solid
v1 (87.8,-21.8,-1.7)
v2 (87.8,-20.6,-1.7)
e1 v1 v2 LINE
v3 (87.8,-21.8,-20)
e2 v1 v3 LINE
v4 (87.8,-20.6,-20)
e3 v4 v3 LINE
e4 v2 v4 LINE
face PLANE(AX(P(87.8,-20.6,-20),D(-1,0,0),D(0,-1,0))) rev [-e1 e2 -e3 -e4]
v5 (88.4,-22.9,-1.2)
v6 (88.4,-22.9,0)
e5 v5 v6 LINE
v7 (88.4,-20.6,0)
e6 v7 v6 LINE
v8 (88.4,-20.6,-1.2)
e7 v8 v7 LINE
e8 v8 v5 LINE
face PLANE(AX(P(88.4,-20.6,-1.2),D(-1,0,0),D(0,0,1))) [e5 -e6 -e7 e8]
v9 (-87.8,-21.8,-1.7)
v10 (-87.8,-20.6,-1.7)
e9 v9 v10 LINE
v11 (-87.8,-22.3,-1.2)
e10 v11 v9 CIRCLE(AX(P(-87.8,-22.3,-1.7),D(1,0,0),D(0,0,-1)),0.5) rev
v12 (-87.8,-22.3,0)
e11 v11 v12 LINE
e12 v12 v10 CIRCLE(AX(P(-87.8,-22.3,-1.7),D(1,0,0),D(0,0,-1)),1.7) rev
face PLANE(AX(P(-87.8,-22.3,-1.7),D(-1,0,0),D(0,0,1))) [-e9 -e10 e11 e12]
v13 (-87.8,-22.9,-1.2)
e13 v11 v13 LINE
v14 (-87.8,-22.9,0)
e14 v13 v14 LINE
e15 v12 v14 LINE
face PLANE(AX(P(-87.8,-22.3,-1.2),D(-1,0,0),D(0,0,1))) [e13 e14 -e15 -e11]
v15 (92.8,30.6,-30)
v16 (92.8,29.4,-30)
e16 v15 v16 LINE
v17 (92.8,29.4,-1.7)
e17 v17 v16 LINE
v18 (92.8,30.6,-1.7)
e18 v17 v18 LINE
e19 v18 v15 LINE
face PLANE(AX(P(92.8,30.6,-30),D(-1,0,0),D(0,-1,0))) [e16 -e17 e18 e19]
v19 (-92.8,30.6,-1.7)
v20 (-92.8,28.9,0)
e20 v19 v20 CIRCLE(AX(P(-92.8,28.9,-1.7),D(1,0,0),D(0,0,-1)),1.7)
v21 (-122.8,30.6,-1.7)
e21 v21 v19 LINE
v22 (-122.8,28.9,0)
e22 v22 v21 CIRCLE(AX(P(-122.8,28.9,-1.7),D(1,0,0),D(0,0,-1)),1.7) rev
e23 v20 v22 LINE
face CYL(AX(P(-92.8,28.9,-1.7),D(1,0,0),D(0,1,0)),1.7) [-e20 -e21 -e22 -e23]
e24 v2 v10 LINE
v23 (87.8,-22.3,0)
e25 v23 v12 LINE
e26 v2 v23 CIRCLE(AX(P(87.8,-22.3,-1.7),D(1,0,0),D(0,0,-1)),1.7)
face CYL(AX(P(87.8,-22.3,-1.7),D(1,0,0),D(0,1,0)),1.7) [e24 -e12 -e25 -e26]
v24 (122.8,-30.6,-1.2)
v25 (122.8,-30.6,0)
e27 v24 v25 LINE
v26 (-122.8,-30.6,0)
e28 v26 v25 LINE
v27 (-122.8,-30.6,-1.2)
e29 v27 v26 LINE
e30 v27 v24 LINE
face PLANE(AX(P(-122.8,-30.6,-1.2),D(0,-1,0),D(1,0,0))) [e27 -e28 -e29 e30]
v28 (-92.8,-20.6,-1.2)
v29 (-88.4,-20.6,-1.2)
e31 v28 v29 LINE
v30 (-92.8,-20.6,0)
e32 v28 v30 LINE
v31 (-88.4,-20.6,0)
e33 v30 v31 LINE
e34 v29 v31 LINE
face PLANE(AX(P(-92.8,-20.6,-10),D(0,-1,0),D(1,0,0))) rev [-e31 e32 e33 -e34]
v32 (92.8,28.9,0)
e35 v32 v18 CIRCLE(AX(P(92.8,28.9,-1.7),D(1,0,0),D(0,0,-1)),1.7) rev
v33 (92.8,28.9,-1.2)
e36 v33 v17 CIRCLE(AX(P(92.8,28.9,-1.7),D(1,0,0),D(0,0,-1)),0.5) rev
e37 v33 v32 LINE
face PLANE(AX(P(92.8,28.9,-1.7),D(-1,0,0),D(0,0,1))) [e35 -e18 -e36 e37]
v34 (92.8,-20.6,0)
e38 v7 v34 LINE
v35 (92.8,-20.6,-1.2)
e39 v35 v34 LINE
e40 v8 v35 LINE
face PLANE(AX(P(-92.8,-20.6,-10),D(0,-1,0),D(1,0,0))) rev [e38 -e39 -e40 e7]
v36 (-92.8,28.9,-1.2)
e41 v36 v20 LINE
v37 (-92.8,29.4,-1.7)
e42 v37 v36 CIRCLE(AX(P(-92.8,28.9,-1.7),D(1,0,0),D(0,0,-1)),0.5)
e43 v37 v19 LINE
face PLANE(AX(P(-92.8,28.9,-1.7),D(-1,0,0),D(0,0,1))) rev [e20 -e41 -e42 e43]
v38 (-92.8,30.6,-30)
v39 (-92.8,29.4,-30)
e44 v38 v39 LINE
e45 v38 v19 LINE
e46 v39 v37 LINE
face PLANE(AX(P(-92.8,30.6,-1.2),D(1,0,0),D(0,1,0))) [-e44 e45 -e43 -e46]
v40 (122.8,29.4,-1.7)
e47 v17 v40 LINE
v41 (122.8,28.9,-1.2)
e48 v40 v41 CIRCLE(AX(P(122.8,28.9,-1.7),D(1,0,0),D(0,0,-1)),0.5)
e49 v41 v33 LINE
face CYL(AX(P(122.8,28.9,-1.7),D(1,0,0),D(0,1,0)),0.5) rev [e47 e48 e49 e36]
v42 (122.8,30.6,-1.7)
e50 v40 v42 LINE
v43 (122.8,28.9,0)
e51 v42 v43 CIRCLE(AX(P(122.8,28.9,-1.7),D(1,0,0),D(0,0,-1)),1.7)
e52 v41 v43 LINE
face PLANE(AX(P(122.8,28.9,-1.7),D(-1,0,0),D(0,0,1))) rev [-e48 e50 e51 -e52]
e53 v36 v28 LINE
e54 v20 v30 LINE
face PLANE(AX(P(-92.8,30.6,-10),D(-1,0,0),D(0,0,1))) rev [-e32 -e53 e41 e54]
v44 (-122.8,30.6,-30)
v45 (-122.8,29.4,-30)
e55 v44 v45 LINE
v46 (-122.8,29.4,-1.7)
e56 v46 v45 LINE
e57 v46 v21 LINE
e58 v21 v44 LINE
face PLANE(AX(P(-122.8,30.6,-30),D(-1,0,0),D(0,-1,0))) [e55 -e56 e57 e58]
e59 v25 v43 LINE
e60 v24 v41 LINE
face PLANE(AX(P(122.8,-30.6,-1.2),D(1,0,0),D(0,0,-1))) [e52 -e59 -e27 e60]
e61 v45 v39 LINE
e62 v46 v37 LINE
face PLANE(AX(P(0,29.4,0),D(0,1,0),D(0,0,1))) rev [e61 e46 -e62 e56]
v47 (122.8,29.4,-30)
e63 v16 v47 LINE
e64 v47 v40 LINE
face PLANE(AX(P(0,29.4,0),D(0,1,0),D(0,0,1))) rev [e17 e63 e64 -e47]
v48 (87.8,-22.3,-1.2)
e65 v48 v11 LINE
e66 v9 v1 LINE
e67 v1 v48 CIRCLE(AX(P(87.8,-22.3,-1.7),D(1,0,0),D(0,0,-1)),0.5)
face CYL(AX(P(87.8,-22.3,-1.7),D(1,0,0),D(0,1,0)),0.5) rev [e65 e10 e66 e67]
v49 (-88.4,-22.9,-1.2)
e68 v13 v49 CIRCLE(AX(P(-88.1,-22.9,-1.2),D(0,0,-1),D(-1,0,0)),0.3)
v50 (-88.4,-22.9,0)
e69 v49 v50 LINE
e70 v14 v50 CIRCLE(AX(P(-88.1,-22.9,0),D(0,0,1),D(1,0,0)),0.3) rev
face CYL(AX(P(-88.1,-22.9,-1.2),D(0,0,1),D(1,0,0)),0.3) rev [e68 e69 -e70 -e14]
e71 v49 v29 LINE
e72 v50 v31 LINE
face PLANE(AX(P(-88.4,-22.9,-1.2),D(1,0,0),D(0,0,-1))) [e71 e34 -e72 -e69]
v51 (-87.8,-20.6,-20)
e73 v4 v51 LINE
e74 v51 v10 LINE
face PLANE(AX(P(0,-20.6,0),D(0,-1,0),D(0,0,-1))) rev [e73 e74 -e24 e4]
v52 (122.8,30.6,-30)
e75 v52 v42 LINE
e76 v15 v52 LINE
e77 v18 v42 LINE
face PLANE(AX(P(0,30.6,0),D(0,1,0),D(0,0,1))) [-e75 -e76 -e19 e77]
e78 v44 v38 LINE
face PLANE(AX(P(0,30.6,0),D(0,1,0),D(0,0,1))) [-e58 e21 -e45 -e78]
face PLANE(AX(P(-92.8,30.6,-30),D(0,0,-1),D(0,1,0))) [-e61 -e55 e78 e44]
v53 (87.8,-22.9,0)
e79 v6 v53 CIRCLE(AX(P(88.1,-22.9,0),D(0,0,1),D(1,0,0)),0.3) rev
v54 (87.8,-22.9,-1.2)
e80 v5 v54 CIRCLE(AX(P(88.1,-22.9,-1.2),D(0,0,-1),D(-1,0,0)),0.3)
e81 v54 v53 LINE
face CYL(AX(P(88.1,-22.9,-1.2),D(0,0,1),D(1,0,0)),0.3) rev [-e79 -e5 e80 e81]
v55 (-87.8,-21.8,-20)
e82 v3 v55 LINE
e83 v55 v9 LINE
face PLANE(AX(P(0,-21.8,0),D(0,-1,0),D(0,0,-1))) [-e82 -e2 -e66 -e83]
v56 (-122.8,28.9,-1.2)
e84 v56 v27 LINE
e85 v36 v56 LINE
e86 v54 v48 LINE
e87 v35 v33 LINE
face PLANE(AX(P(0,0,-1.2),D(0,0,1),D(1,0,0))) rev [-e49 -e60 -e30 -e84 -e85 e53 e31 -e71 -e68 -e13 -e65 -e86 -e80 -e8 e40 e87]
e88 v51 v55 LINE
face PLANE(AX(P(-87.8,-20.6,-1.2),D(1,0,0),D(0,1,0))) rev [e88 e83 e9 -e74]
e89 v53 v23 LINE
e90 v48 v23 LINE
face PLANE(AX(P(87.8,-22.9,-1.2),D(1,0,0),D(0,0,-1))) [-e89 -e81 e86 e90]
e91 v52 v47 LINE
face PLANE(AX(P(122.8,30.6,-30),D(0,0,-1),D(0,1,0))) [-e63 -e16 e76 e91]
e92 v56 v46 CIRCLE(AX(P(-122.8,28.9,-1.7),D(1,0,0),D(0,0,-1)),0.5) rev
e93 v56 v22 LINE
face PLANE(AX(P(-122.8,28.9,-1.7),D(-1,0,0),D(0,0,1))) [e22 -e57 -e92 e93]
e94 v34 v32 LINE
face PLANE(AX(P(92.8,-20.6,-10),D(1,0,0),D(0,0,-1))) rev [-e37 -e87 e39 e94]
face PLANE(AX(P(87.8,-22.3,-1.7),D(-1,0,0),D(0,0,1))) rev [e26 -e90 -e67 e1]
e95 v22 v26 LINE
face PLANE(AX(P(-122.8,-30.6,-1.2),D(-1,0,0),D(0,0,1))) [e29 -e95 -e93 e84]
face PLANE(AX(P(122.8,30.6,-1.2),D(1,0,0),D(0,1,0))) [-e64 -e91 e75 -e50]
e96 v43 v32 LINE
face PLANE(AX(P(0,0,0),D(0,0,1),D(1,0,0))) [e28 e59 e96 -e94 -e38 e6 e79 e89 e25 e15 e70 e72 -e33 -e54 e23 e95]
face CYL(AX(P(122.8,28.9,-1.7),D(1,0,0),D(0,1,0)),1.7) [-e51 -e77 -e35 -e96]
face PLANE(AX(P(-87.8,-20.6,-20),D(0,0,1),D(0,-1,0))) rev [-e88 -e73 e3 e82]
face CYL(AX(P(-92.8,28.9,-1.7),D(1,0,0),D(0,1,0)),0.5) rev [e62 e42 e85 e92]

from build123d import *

# Parameters (mm, degrees)
SKETCH_2_W                         = 245.6
SKETCH_2_H                         = 61.2
SM_BASE_FLANGE_1_DEPTH             = 1.2
SKETCH_8_W                         = 185.6
SKETCH_8_H                         = 51.2
CUT_EXTRUDE_1_DEPTH                = 10
SM_EDGE_FLANGE_1_STRIP_W           = 5.8
SM_EDGE_FLANGE_1_STRIP_H           = 1.2
SM_EDGE_FLANGE_1_STRIP_CUT_DEPTH   = 30
SM_EDGE_FLANGE_1_STRIP_2_W         = 5.8
SM_EDGE_FLANGE_1_STRIP_2_H         = 1.2
SM_EDGE_FLANGE_1_STRIP_CUT_2_DEPTH = 30
SM_EDGE_FLANGE_1_DEPTH             = 30
SM_EDGE_FLANGE_1_BEND_DEPTH        = 30
SM_START                           = -1.7
SM_EDGE_FLANGE_2_DEPTH             = 2.7
SM_START_2                         = -20
SM_EDGE_FLANGE_2_2_OUTLINE_W       = 175.6
SM_EDGE_FLANGE_2_2_OUTLINE_H       = 1.2
SM_EDGE_FLANGE_2_2_DEPTH           = 18.3
SM_START_3                         = -87.8
SM_EDGE_FLANGE_2_3_DEPTH           = 175.6
SM_EDGE_FLANGE_2_4_DEPTH           = 175.6


with BuildPart() as part:
    # 基体-法兰1: sheet metal written as solids
    # Sketch 2 → 基体-法兰1 (new body)
    with BuildSketch(Plane.XY):
        Rectangle(SKETCH_2_W, SKETCH_2_H)
    extrude(amount=-SM_BASE_FLANGE_1_DEPTH)

    # 草图8 → 切除-拉伸1 (cut)
    with BuildSketch(Plane.XY):
        with Locations((0, 5)):
            Rectangle(SKETCH_8_W, SKETCH_8_H)
    extrude(amount=-CUT_EXTRUDE_1_DEPTH, mode=Mode.SUBTRACT)

    # 边线-法兰1: sheet metal written as solids
    # 边线-法兰1 strip (on a plane across the edge) → 边线-法兰1 strip cut (cut)
    with BuildSketch(Plane(origin=(92.8, 30.6, -1.2), x_dir=(0, -1, 0), z_dir=(1, 0, 0))):
        with Locations((-1.2, -0.6)):
            Rectangle(SM_EDGE_FLANGE_1_STRIP_W, SM_EDGE_FLANGE_1_STRIP_H)
    extrude(amount=SM_EDGE_FLANGE_1_STRIP_CUT_DEPTH, mode=Mode.SUBTRACT)

    # 边线-法兰1 strip 2 (on a plane across the edge) → 边线-法兰1 strip cut 2 (cut)
    with BuildSketch(Plane(origin=(-122.8, 30.6, -1.2), x_dir=(0, -1, 0), z_dir=(1, 0, 0))):
        with Locations((-1.2, -0.6)):
            Rectangle(SM_EDGE_FLANGE_1_STRIP_2_W, SM_EDGE_FLANGE_1_STRIP_2_H)
    extrude(amount=SM_EDGE_FLANGE_1_STRIP_CUT_2_DEPTH, mode=Mode.SUBTRACT)

    # 边线-法兰1 section (on a plane across the edge) → 边线-法兰1 (add)
    with BuildSketch(Plane(origin=(92.8, 30.6, -1.2), x_dir=(0, -1, 0), z_dir=(1, 0, 0))):
        with BuildLine():
            Line((0, 0.5), (0, 28.8))
            Line((0, 28.8), (1.2, 28.8))
            Line((1.2, 28.8), (1.2, 0.5))
            ThreePointArc((1.2, 0.5), (1.346446609, 0.146446609), (1.7, 0))
            Line((1.7, 0), (1.7, -1.2))
            ThreePointArc((1.7, -1.2), (0.497918472, -0.702081528), (0, 0.5))
        make_face()
    extrude(amount=SM_EDGE_FLANGE_1_DEPTH)

    # 边线-法兰1 section 2 (on a plane across the edge) → 边线-法兰1 bend (add)
    with BuildSketch(Plane(origin=(-122.8, 30.6, -1.2), x_dir=(0, -1, 0), z_dir=(1, 0, 0))):
        with BuildLine():
            Line((0, 0.5), (0, 28.8))
            Line((0, 28.8), (1.2, 28.8))
            Line((1.2, 28.8), (1.2, 0.5))
            ThreePointArc((1.2, 0.5), (1.346446609, 0.146446609), (1.7, 0))
            Line((1.7, 0), (1.7, -1.2))
            ThreePointArc((1.7, -1.2), (0.497918472, -0.702081528), (0, 0.5))
        make_face()
    extrude(amount=SM_EDGE_FLANGE_1_BEND_DEPTH)

    # 边线-法兰2: read off the stored shape, not the designer's step
    # 边线-法兰2 outline → 边线-法兰2 (cut)
    with BuildSketch(Plane.XY.offset(SM_START)):
        with BuildLine():
            Line((-87.8, -22.9), (-87.8, -20.6))
            Line((-87.8, -20.6), (-88.4, -20.6))
            Line((-88.4, -20.6), (-88.4, -22.9))
            ThreePointArc((-88.4, -22.9), (-88.1, -23.2), (-87.8, -22.9))
        make_face()
        with BuildLine():
            Line((88.4, -20.6), (87.8, -20.6))
            Line((87.8, -20.6), (87.8, -22.9))
            ThreePointArc((87.8, -22.9), (88.1, -23.2), (88.4, -22.9))
            Line((88.4, -22.9), (88.4, -20.6))
        make_face()
    extrude(amount=SM_EDGE_FLANGE_2_DEPTH, mode=Mode.SUBTRACT)

    # Sm Edge Flange 2 3 outline → Sm Edge Flange 2 3 (cut)
    with BuildSketch(Plane.YZ.offset(SM_START_3)):
        with BuildLine():
            ThreePointArc((-22.3, 0), (-21.290049506, -0.332520567), (-20.675192319, -1.2))
            Line((-20.675192319, -1.2), (-20.6, -1.2))
            Line((-20.6, -1.2), (-20.6, 0))
            Line((-20.6, 0), (-22.3, 0))
        make_face()
    extrude(amount=SM_EDGE_FLANGE_2_3_DEPTH, mode=Mode.SUBTRACT)



with BuildPart() as body_2:
    # Sm Edge Flange 2 2 outline → Sm Edge Flange 2 2 (new body)
    with BuildSketch(Plane.XY.offset(SM_START_2)):
        with Locations((0, -21.2)):
            Rectangle(SM_EDGE_FLANGE_2_2_OUTLINE_W, SM_EDGE_FLANGE_2_2_OUTLINE_H)
    extrude(amount=SM_EDGE_FLANGE_2_2_DEPTH)


with BuildPart() as part_1:
    add(part.part)

    add(body_2.part)  # Sm Edge Flange 2 4 merges body 2
    # Sm Edge Flange 2 4 outline → Sm Edge Flange 2 4 (add)
    with BuildSketch(Plane.YZ.offset(SM_START_3)):
        with BuildLine():
            Line((-21.8, -1.7), (-20.6, -1.7))
            ThreePointArc((-20.6, -1.7), (-20.618903177, -1.447188863), (-20.675192319, -1.2))
            Line((-20.675192319, -1.2), (-22.3, -1.2))
            ThreePointArc((-22.3, -1.2), (-21.946446609, -1.346446609), (-21.8, -1.7))
        make_face()
    extrude(amount=SM_EDGE_FLANGE_2_4_DEPTH)


solid = part_1.part
